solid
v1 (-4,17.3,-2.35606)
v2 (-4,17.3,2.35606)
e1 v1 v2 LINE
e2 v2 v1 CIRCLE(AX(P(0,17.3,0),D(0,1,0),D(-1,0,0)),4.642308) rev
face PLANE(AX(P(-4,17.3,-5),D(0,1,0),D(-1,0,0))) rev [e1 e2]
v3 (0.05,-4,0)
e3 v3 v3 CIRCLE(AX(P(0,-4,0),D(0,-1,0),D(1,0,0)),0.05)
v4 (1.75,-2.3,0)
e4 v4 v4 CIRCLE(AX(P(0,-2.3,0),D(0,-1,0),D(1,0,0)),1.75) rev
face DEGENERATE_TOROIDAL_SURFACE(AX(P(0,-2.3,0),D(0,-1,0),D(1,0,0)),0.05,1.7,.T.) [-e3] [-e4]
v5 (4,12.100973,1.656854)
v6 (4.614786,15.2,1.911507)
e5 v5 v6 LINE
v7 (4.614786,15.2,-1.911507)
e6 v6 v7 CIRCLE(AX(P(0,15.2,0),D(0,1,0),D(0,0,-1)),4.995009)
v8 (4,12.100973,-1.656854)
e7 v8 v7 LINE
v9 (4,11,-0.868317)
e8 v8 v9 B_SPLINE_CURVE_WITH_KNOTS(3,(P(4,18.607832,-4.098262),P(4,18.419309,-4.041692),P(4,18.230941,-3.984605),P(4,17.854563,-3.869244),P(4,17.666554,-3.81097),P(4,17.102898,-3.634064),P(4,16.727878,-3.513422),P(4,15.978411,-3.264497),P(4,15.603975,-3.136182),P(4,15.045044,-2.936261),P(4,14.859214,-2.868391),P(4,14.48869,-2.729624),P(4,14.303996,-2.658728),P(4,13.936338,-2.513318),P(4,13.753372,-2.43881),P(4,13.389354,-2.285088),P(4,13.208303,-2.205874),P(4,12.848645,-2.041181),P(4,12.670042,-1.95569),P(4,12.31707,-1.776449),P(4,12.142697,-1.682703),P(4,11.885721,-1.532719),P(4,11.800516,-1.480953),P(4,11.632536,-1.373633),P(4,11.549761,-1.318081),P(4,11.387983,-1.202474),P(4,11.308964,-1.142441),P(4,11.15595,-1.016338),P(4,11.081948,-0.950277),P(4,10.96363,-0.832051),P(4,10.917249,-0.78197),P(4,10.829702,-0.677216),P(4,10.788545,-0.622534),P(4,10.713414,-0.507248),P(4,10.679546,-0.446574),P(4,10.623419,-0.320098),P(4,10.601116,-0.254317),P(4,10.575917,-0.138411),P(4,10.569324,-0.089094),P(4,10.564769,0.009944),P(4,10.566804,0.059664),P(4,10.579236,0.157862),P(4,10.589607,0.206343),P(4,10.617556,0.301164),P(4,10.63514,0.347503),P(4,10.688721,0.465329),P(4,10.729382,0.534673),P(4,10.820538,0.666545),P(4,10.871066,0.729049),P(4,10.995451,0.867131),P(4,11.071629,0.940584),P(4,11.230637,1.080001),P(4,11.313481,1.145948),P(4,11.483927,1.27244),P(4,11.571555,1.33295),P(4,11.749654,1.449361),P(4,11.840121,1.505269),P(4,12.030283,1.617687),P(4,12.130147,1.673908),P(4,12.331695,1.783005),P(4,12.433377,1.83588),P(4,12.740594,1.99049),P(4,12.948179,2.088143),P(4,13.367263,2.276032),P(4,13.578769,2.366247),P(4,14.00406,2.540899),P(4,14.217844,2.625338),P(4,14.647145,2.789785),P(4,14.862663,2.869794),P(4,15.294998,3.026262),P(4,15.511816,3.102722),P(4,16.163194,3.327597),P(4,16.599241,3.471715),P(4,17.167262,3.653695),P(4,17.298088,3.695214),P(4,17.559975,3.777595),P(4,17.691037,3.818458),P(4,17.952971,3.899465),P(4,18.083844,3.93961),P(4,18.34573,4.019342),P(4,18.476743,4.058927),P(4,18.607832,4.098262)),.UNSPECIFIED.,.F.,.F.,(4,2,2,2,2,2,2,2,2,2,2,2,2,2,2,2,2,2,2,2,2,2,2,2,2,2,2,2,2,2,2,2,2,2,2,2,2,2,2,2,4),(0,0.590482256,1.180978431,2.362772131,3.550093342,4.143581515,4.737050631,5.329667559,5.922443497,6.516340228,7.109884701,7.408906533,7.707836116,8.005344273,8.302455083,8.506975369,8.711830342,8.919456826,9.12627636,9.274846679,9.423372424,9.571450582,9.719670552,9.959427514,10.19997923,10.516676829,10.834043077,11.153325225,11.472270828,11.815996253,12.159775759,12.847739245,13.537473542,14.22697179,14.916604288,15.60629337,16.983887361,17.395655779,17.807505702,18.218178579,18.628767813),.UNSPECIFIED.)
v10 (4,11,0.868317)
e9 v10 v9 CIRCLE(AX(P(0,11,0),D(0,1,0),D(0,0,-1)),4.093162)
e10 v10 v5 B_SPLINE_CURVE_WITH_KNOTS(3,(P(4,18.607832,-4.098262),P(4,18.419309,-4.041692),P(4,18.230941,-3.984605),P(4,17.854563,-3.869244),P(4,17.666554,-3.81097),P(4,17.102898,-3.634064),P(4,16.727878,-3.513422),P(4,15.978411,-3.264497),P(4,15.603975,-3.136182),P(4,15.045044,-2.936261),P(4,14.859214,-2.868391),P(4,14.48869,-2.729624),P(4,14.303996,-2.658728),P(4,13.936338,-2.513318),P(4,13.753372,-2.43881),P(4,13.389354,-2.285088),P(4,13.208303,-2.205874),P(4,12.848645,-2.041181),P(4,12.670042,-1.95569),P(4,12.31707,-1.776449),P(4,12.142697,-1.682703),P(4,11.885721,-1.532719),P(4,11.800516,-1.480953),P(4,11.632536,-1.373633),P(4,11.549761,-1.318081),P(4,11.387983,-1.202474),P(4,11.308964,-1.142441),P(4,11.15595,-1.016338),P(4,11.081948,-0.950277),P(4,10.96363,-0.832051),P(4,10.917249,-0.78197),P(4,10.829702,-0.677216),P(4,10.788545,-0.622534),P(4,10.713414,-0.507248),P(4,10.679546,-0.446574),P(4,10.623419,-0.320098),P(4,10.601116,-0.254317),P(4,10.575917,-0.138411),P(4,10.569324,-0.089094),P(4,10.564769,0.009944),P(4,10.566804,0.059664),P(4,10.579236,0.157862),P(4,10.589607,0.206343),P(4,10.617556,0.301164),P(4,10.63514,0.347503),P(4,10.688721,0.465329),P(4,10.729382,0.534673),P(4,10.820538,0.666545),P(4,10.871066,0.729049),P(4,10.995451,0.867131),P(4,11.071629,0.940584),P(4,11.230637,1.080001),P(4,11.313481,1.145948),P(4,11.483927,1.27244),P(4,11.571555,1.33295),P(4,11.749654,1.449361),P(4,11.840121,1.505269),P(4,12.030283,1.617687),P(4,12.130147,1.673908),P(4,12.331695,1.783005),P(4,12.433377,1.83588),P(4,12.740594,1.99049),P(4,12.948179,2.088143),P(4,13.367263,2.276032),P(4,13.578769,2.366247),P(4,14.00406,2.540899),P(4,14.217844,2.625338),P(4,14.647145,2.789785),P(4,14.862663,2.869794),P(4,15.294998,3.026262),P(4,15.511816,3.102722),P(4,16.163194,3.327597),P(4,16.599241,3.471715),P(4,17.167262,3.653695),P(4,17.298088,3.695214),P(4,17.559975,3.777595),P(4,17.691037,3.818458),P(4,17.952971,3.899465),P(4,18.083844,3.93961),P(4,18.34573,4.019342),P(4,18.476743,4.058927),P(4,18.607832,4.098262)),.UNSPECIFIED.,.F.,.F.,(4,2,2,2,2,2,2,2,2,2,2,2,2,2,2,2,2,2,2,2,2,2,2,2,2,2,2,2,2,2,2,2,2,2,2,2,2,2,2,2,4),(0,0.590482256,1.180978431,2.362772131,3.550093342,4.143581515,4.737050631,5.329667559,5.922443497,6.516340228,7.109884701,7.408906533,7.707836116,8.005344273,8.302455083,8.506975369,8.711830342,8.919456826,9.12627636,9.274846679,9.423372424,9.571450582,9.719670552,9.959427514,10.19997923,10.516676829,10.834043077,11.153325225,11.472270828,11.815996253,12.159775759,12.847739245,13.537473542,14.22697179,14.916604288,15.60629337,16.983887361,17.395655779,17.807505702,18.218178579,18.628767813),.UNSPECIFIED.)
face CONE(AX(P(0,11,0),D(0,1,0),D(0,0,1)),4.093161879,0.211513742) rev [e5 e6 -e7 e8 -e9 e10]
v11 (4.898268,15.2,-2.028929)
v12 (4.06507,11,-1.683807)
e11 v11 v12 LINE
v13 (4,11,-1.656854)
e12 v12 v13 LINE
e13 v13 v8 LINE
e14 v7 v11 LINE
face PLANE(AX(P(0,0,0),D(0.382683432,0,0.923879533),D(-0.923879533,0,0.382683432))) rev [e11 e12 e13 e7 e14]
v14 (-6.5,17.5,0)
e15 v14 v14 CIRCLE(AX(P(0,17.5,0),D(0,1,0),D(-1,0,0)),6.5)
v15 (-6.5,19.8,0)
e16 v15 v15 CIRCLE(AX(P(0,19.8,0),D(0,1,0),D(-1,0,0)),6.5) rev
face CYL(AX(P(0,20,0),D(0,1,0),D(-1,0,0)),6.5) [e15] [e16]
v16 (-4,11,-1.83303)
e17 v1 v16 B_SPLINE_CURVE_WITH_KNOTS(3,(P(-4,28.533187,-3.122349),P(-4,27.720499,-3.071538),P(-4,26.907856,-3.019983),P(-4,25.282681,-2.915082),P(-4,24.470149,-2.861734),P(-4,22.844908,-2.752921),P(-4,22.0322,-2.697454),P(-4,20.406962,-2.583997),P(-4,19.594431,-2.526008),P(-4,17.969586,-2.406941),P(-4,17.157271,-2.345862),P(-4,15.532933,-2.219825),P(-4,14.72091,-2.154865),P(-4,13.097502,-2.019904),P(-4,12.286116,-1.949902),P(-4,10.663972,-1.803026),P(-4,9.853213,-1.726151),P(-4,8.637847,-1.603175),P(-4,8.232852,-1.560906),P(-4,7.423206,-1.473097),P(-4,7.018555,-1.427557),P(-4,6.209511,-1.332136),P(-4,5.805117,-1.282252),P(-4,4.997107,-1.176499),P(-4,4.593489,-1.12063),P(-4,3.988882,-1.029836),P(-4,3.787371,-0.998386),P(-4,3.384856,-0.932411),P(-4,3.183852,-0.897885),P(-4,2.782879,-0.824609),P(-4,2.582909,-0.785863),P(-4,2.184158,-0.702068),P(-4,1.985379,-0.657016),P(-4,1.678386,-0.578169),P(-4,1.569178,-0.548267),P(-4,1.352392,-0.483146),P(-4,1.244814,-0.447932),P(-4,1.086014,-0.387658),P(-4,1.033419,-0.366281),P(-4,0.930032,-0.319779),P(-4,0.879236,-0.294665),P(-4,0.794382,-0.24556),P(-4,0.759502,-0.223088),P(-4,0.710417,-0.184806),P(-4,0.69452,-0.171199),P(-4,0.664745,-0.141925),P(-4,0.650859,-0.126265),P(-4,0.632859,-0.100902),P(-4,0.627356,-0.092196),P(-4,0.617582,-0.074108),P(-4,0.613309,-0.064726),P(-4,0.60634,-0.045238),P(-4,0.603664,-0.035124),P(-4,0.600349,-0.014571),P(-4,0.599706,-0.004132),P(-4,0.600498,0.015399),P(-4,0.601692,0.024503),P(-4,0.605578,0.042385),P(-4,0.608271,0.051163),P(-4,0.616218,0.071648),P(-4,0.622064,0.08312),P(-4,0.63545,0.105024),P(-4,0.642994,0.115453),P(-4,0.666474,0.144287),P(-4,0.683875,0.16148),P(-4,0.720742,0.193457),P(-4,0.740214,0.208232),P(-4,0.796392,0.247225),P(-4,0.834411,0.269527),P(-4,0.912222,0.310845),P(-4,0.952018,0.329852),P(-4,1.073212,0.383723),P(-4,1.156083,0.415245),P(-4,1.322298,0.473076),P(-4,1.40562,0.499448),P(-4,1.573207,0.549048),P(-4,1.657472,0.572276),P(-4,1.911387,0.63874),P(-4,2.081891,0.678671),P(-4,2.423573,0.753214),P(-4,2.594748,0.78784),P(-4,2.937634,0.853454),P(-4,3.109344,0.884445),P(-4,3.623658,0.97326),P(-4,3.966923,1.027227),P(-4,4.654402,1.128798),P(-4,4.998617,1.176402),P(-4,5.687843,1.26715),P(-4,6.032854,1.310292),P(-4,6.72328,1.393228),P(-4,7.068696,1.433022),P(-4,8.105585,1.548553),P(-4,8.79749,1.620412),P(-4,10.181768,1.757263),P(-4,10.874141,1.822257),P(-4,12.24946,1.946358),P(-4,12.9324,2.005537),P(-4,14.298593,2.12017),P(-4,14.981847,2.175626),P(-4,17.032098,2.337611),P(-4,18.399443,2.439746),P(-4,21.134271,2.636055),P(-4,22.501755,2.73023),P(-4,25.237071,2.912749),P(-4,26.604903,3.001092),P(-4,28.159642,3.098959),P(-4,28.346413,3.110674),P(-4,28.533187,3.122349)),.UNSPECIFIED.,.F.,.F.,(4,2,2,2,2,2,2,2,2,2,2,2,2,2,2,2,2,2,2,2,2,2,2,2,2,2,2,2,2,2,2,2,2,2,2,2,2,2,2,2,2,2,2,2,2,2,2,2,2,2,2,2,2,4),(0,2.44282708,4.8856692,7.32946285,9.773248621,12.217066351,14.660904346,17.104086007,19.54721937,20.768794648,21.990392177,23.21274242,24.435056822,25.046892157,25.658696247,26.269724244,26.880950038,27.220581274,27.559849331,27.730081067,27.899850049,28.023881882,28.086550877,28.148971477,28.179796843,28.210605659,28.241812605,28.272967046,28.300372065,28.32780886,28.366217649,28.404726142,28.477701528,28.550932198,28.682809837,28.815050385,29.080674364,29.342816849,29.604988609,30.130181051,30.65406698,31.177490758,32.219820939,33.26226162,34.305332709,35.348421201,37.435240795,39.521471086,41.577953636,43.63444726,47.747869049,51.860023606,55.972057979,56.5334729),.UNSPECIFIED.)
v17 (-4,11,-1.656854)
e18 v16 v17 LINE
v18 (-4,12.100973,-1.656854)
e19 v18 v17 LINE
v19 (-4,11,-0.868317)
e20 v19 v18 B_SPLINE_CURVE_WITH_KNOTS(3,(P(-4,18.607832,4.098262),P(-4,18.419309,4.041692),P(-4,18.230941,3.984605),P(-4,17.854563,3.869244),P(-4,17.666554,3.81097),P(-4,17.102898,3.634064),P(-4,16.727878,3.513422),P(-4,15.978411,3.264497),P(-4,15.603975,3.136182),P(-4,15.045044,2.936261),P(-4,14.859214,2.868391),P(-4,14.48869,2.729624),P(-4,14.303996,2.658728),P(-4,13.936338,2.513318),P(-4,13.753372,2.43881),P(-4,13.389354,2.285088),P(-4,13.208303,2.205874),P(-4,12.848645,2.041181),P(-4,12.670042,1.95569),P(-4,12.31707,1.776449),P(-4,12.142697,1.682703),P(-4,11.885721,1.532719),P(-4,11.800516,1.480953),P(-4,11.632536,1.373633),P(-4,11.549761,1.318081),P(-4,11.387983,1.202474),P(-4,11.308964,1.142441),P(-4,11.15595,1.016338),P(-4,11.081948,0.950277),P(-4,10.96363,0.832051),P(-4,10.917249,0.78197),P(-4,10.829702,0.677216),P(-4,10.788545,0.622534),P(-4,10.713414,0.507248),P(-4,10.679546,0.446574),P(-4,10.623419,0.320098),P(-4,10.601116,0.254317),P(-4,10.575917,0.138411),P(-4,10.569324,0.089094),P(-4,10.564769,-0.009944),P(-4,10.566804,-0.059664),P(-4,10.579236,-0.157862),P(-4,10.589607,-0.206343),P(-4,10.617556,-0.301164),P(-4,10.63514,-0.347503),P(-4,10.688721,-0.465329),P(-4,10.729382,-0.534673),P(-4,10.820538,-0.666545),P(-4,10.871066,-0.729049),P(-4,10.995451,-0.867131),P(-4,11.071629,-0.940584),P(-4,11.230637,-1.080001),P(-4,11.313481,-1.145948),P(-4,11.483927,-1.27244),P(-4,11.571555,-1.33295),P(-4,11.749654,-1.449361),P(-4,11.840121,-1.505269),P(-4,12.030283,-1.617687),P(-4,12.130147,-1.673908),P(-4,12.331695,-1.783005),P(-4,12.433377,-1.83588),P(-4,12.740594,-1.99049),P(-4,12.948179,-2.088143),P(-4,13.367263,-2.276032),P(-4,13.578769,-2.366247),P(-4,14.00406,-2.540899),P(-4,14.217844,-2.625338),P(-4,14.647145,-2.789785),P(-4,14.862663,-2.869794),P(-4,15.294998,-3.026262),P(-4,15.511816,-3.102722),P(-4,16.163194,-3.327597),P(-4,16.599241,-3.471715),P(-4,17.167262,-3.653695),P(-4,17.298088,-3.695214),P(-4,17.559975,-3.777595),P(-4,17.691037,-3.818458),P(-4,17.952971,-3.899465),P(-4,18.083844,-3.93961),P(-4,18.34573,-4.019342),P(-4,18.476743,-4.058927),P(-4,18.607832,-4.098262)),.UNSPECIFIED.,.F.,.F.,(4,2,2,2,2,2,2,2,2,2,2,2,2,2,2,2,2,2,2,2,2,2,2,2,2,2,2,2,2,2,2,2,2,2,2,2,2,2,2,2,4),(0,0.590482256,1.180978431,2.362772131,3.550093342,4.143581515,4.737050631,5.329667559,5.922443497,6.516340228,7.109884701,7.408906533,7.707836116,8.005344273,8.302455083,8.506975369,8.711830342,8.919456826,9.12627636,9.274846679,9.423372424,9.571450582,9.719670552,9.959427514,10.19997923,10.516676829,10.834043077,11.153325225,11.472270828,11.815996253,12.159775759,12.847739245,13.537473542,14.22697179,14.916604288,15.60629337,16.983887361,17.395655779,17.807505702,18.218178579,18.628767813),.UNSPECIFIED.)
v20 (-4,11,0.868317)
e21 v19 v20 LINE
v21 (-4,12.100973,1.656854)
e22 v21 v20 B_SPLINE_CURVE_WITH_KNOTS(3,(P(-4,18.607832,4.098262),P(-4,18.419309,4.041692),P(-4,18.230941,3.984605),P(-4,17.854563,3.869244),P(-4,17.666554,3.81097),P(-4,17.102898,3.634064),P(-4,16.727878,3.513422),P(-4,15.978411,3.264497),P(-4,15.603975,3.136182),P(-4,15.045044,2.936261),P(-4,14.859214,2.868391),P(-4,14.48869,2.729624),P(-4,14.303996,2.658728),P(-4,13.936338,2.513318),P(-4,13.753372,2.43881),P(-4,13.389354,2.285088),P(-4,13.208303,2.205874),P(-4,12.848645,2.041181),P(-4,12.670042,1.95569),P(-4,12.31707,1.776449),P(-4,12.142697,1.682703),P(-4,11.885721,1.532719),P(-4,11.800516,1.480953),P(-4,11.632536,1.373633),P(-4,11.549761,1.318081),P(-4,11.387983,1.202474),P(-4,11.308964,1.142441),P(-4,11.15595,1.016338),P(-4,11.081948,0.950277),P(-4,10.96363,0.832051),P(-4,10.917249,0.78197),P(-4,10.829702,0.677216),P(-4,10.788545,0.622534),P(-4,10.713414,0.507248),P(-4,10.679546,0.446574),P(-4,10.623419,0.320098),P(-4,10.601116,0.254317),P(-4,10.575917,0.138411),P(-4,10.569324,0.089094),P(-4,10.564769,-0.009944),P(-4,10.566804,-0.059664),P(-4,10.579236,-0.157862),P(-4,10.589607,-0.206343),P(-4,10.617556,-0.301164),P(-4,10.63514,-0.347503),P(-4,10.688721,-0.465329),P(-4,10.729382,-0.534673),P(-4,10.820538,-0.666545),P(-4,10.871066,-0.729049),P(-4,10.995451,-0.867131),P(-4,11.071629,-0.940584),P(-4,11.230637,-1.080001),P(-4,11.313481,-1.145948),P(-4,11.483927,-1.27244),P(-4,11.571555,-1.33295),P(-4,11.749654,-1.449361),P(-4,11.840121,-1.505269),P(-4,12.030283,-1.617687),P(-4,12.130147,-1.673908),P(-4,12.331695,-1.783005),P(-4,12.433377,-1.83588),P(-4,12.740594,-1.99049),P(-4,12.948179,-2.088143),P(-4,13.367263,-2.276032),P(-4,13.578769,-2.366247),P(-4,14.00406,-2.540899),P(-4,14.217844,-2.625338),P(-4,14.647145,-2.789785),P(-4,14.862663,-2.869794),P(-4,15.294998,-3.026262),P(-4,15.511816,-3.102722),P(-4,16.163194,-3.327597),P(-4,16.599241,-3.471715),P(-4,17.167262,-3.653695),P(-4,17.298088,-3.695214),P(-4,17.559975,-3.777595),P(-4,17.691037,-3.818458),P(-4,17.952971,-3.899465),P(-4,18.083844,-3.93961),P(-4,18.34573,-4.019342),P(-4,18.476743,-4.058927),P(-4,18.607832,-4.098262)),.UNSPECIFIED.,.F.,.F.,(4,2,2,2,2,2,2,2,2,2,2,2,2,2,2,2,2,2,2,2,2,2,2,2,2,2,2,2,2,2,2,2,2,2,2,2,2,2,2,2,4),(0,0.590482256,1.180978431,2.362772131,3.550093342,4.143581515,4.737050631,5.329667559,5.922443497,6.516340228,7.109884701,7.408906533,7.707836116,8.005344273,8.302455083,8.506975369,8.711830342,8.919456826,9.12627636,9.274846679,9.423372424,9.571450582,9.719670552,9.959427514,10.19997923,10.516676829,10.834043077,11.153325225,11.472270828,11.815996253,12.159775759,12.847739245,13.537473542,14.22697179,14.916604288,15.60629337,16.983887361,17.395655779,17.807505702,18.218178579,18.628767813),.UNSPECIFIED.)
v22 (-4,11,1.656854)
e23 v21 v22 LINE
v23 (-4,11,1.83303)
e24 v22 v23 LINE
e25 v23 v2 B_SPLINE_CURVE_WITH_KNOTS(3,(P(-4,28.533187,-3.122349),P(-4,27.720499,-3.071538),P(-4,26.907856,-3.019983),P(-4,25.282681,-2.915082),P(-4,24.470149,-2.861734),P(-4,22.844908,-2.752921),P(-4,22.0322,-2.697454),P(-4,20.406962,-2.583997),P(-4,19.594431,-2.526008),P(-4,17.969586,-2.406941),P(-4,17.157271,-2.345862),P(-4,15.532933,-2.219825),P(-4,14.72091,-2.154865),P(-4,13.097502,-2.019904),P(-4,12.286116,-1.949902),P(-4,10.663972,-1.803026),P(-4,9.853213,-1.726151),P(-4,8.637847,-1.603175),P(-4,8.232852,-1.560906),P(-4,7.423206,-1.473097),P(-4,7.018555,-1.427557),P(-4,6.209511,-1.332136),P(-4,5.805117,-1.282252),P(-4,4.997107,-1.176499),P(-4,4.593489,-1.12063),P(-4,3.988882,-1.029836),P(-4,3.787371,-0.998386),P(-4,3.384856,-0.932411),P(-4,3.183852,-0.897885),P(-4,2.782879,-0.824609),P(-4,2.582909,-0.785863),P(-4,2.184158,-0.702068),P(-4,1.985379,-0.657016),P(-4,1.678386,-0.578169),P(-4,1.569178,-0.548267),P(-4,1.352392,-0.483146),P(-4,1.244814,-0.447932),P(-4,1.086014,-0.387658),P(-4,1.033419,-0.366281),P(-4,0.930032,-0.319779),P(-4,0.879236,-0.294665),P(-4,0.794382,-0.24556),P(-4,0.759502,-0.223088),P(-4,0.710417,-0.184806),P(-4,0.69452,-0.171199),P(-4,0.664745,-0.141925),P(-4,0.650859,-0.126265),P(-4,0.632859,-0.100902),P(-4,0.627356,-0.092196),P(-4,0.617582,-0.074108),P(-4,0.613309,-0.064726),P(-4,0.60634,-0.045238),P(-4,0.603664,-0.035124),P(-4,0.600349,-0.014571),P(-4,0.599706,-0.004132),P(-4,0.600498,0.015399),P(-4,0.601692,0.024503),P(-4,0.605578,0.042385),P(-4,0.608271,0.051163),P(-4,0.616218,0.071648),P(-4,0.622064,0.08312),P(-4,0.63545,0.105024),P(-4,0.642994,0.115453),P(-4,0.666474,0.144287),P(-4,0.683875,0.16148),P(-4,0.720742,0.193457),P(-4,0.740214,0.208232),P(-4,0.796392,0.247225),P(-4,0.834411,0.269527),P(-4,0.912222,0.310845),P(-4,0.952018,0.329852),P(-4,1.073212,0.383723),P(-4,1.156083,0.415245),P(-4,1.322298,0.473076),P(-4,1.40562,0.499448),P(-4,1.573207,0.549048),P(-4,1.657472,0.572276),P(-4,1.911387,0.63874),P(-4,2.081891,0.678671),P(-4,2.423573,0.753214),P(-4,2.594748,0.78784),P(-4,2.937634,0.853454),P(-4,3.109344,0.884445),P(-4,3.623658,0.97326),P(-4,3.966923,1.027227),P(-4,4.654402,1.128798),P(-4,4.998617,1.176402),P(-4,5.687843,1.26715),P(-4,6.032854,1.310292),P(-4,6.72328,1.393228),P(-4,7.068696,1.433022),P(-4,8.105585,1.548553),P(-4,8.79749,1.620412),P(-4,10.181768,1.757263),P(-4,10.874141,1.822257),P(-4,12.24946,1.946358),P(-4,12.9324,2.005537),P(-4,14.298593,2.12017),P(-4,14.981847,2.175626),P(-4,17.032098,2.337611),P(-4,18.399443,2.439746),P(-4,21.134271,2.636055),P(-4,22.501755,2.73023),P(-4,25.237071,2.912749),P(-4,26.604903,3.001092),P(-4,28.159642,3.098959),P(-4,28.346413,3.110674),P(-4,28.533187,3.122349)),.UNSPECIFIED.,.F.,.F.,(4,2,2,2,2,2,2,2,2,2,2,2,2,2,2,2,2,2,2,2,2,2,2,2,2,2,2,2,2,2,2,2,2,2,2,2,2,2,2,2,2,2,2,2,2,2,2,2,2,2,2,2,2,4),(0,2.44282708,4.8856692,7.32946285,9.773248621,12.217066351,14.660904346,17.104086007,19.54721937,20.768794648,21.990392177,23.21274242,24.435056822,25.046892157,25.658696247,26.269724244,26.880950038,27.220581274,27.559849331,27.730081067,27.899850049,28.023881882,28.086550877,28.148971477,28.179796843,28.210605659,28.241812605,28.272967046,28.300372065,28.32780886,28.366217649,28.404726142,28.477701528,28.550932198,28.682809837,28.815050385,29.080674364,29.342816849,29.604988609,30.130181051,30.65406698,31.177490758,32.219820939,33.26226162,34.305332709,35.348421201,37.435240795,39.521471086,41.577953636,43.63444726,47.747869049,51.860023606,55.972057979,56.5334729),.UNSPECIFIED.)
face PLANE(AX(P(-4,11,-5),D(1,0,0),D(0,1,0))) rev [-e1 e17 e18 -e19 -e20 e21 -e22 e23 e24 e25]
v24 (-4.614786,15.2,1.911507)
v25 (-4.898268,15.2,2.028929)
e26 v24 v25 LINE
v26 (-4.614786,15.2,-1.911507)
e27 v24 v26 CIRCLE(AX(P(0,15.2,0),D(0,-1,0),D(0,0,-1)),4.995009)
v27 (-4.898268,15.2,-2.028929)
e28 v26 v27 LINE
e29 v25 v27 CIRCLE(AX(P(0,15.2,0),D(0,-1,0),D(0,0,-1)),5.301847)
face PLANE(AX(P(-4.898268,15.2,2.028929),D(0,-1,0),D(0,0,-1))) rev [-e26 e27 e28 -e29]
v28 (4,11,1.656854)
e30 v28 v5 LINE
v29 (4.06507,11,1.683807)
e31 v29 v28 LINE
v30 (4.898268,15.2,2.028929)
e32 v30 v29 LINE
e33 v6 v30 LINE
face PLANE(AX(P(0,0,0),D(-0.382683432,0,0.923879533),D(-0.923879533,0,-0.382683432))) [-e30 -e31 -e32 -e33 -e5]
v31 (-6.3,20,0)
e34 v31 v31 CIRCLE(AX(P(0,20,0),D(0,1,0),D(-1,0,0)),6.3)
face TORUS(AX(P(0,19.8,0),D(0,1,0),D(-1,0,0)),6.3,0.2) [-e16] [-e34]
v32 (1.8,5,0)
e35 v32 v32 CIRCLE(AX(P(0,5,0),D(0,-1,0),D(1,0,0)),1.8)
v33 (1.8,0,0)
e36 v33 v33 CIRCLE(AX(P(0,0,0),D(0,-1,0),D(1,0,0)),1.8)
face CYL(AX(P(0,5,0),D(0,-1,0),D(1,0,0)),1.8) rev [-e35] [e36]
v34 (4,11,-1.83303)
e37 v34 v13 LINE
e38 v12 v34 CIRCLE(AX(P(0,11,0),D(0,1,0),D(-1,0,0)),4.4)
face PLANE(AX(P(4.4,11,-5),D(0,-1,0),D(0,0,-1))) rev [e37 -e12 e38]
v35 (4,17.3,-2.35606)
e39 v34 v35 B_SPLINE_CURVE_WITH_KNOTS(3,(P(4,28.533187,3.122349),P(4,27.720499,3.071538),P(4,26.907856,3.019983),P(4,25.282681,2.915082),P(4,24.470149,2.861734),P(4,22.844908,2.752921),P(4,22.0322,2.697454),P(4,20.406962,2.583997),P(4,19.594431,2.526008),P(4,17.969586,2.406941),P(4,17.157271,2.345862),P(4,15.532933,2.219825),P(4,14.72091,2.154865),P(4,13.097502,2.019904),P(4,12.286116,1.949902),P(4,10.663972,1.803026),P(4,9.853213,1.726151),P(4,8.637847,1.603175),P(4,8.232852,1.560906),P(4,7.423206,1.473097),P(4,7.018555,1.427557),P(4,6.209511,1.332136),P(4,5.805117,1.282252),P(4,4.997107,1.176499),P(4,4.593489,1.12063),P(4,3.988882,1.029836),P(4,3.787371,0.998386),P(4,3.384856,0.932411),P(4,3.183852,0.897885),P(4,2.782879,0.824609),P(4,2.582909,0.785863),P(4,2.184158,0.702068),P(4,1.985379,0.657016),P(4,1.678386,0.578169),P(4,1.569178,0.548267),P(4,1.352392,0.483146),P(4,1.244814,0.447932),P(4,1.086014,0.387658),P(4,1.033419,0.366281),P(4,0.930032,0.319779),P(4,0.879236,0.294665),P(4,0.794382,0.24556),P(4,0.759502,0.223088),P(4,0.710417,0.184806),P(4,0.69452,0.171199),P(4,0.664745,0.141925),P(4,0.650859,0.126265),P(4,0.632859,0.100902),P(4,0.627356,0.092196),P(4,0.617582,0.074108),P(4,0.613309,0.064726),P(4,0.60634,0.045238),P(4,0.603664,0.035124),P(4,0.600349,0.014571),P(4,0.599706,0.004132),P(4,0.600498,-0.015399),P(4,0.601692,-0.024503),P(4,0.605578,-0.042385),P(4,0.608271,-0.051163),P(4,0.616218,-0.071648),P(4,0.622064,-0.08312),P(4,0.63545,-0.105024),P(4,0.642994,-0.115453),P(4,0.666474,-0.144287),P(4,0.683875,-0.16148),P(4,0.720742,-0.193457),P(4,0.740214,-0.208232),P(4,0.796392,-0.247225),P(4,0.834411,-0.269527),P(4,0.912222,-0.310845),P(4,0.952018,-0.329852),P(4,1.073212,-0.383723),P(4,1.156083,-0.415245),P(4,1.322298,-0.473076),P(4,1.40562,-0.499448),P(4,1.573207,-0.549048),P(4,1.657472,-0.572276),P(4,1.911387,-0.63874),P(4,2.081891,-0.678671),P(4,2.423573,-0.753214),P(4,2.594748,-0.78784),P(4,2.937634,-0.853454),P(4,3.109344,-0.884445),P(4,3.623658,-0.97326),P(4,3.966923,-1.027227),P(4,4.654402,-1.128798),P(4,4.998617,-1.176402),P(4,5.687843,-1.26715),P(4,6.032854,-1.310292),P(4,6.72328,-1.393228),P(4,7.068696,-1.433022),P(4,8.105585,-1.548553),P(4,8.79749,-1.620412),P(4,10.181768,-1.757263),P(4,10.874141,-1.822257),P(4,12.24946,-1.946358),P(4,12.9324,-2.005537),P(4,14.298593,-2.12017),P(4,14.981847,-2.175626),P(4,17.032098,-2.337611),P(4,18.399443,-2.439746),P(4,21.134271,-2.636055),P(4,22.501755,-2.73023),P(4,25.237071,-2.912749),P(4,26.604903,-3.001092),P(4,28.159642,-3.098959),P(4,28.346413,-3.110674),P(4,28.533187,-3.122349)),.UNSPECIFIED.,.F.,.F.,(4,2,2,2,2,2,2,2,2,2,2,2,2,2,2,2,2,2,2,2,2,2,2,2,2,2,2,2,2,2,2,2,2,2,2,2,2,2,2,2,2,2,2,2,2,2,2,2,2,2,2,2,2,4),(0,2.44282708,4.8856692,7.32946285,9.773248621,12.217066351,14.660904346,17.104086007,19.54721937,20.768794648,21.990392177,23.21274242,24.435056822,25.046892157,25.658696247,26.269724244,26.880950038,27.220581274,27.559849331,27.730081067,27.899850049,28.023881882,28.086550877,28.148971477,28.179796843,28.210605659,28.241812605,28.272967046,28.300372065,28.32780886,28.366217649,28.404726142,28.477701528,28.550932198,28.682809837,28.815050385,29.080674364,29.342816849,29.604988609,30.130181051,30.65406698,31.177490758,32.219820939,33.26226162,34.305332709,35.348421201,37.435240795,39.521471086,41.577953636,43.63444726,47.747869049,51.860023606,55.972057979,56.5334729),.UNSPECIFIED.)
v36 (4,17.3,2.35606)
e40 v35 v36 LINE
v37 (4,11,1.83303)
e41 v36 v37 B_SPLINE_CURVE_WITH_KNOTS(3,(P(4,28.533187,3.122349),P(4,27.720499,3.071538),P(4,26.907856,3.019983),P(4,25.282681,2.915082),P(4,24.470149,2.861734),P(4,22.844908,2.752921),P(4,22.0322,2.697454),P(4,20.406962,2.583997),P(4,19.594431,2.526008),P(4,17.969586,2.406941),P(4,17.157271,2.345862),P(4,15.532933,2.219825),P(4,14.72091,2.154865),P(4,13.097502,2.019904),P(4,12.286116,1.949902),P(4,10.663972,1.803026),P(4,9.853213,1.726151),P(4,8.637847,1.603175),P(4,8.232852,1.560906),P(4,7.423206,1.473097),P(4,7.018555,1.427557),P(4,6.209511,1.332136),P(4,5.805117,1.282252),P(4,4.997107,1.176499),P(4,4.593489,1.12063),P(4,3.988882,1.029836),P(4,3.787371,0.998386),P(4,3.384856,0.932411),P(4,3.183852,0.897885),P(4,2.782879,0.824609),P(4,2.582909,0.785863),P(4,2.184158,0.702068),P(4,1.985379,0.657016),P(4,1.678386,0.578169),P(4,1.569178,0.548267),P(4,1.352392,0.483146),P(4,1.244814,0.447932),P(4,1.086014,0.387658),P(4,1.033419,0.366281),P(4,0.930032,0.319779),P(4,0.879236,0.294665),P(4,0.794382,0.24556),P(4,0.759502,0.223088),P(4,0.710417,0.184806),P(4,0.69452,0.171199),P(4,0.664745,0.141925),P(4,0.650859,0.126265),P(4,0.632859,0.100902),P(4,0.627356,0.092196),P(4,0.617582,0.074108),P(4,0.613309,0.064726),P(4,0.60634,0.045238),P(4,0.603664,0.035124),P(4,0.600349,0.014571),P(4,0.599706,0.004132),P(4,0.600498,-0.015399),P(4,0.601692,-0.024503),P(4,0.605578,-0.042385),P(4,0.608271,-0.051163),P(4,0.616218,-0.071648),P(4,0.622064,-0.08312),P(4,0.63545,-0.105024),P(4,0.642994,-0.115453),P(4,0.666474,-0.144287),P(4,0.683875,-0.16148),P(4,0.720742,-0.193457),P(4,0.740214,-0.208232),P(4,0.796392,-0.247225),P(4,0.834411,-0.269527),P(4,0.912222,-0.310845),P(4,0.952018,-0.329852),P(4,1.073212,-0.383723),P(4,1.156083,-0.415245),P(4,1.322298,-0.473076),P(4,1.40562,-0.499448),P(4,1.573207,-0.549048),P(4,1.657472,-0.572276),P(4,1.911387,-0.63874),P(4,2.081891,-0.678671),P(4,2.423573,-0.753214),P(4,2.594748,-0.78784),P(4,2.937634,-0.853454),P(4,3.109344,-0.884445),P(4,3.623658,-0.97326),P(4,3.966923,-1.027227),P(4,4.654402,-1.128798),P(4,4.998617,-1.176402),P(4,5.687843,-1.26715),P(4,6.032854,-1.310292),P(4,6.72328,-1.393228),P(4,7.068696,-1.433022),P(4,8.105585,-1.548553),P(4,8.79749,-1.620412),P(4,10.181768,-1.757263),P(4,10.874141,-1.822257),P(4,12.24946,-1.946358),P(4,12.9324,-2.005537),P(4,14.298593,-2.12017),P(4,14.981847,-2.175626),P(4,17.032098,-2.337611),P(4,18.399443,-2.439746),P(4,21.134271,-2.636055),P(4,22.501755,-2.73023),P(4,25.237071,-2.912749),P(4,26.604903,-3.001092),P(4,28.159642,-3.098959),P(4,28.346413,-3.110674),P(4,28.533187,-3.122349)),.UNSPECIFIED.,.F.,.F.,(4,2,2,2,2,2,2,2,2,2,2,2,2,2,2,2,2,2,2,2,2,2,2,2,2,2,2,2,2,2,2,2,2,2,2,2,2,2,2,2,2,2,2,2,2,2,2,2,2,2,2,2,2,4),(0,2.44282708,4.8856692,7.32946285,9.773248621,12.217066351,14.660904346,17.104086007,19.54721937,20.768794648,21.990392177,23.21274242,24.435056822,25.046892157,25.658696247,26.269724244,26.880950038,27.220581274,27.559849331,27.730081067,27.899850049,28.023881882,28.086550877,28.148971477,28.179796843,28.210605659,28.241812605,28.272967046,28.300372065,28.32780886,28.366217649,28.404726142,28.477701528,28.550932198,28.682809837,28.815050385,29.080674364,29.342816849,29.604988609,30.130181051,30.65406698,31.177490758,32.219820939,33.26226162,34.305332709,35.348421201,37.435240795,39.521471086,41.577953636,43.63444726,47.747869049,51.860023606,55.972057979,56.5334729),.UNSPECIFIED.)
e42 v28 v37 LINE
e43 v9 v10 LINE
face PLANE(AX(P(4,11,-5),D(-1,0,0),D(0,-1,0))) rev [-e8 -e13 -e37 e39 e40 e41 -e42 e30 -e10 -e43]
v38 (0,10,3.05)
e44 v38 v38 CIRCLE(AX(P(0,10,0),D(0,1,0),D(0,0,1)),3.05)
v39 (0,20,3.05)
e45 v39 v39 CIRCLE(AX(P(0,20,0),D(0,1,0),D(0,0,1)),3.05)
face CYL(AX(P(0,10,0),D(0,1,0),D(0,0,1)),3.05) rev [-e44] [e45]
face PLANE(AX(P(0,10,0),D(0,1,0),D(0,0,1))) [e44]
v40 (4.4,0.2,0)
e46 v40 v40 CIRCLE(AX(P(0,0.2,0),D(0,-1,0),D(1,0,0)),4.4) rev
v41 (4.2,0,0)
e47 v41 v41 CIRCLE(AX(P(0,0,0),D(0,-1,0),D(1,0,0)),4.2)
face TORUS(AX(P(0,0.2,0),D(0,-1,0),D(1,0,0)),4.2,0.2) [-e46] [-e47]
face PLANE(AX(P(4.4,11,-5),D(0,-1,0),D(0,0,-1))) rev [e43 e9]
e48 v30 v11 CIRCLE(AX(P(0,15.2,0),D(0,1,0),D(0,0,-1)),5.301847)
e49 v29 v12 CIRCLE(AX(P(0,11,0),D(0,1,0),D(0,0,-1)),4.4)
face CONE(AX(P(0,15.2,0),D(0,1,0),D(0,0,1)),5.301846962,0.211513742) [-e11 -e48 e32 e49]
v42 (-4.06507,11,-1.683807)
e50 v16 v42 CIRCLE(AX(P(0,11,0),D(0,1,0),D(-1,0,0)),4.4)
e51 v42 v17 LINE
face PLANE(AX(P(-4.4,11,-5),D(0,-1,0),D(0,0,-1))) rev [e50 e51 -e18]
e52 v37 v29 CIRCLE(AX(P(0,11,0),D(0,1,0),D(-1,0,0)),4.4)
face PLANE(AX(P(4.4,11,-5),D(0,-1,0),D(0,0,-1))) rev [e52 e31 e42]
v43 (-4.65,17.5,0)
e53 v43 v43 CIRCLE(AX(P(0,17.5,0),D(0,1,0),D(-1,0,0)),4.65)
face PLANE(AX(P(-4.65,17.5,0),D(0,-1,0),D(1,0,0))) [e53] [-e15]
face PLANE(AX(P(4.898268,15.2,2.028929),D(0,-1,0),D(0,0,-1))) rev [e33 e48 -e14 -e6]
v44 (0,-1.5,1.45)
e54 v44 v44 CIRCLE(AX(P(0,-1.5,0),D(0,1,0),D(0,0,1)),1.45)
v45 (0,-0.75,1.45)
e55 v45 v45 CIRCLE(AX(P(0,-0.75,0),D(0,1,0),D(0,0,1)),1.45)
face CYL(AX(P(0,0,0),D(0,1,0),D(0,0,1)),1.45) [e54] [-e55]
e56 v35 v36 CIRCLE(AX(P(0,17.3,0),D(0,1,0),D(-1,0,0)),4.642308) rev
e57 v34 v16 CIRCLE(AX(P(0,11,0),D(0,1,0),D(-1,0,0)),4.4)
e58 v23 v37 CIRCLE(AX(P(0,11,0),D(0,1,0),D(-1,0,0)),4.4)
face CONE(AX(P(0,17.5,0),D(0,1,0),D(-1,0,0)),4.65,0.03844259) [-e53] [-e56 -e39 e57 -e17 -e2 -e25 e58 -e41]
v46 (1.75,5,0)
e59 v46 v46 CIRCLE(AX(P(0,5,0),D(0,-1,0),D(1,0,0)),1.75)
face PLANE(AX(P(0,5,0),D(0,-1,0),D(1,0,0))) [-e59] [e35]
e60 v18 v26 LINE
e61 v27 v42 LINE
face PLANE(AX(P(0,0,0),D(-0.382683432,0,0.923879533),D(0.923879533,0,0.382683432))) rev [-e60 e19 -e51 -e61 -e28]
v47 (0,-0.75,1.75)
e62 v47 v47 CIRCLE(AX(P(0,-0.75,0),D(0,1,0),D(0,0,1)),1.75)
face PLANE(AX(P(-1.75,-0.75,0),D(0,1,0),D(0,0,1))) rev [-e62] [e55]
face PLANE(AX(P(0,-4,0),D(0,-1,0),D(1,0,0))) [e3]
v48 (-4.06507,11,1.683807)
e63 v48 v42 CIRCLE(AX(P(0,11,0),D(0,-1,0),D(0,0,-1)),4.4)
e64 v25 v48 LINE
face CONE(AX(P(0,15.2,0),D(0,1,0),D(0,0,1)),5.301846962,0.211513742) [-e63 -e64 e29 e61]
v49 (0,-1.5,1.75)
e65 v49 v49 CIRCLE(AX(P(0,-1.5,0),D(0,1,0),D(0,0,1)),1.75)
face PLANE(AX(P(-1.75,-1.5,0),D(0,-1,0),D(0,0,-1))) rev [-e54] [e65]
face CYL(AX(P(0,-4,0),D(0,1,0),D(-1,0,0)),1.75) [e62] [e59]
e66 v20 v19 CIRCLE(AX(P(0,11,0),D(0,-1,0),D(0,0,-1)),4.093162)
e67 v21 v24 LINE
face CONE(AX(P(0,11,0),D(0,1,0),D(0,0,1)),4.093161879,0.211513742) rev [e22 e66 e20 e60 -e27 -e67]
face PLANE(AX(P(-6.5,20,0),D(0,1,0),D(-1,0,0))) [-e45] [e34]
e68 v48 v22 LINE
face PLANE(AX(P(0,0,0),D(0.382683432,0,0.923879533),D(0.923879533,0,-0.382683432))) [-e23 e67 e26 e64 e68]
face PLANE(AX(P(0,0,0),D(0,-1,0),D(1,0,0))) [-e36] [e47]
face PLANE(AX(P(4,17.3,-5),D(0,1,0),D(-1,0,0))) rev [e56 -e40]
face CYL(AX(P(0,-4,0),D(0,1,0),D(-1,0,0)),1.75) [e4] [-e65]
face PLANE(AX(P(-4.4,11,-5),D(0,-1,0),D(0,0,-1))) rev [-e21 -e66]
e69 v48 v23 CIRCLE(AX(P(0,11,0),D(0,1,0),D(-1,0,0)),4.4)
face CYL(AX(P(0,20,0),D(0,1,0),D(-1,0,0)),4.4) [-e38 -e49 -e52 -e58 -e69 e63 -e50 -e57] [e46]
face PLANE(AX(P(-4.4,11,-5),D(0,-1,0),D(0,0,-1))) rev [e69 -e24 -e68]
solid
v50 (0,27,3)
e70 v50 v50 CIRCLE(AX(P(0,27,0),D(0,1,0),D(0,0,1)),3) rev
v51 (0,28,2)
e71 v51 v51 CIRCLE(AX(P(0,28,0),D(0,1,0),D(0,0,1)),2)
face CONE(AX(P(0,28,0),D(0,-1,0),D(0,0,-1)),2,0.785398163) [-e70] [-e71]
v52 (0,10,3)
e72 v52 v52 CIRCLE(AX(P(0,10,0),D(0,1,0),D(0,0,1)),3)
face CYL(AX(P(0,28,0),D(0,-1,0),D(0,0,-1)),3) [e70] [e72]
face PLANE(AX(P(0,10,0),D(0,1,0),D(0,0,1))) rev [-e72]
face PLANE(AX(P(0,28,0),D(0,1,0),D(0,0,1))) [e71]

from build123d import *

# Parameters (mm, degrees)
FILLET1_R           = 0.2
CUT_EXTRUDE1_DEPTH  = 5
REVOLVE2_ANGLE      = 45.000276
SKETCH4_R           = 3.05
CUT_EXTRUDE2_DEPTH  = 10
SKETCH5_R           = 3
BOSS_EXTRUDE1_DEPTH = 18
CHAMFER1_SIZE       = 1
SKETCH6_R           = 1.8
CUT_EXTRUDE3_DEPTH  = 5
SKETCH7_R           = 1.75
BOSS_EXTRUDE2_DEPTH = 9
FILLET2_R           = 1.7
SKETCH8_W           = 0.3
SKETCH8_H           = 0.75


# Read off the part's stored shape, not the designer's step: Revolve2
with BuildPart() as part:
    # Sketch1 → Revolve1 (revolve)
    with BuildSketch(Plane.XY):
        Polygon((0, 0), (-4.4, 0), (-4.4, 11), (-4.65, 17.5), (-6.5, 17.5), (-6.5, 20), (0, 20), align=None)
    revolve(axis=Axis((0, 20, 0), (0, -1, 0)))

    # Fillet1
    fillet1_edges = [part.edges().sort_by_distance(p)[0] for p in [
        (6.5, 20, 0),
        (4.4, 0, 0),
    ]]
    fillet(fillet1_edges, radius=FILLET1_R)

    # Sketch2 → Cut-Extrude1 (cut, symmetric)
    with BuildSketch(Plane.XY):
        Polygon((-4, 11), (-4, 17.3), (-4.642307692, 17.3), (-4.4, 11), align=None)
        Polygon((4.4, 11), (4, 11), (4, 17.3), (4.642307692, 17.3), align=None)
    extrude(amount=CUT_EXTRUDE1_DEPTH, both=True, mode=Mode.SUBTRACT)

    # Revolve2 outline → Revolve2 (revolve)
    with BuildSketch(Plane(origin=(0, 0, 0), x_dir=(-0.923879239596717, 0, -0.3826841395226511), z_dir=(0.3826841395226511, 0, -0.923879239596717))):
        Polygon((4.4, 12.42897871), (4.093159214, 10.999987589), (4.4, 10.999987589), align=None)
        Polygon((4.995008841, 15.2), (4.4, 12.42897871), (4.4, 10.999987589), (5.301846962, 15.2), align=None)
    revolve2 = revolve(axis=Axis((0, 0, 0), (0, 1, 0)), revolution_arc=REVOLVE2_ANGLE)

    # Mirror1: Revolve2 across plane
    add(revolve2.mirror(Plane(origin=(0, 0, 0), x_dir=(0, 0, 1), z_dir=(1, 0, 0))))

    # Sketch4 → Cut-Extrude2 (cut)
    with BuildSketch(Plane(origin=(0, 20, 0), x_dir=(1, 0, 0), z_dir=(0, 1, 0))):
        with Locations(Location((0, 0, 0), (0, 0, 270))):
            Circle(SKETCH4_R)
    extrude(amount=-CUT_EXTRUDE2_DEPTH, mode=Mode.SUBTRACT)

    # Sketch6 → Cut-Extrude3 (cut)
    with BuildSketch(Plane(origin=(0, 0, 0), x_dir=(-1, 0, 0), z_dir=(0, -1, 0))):
        with Locations(Location((0, 0, 0), (0, 0, 180))):
            Circle(SKETCH6_R)
    extrude(amount=-CUT_EXTRUDE3_DEPTH, mode=Mode.SUBTRACT)

    # Sketch7 → Boss-Extrude2 (add)
    with BuildSketch(Plane(origin=(0, 5, 0), x_dir=(-1, 0, 0), z_dir=(0, -1, 0))):
        with Locations(Location((0, 0, 0), (0, 0, 180))):
            Circle(SKETCH7_R)
    extrude(amount=BOSS_EXTRUDE2_DEPTH)

    # Fillet2
    fillet2_edges = [part.edges().sort_by_distance(p)[0] for p in [
        (-1.75, -4, 0),
    ]]
    fillet(fillet2_edges, radius=FILLET2_R)

    # Sketch8 → Cut-Revolve1 (revolve, cut)
    with BuildSketch(Plane.XY, mode=Mode.PRIVATE) as cut_revolve1_sk:
        with Locations((-1.6, -1.125)):
            Rectangle(SKETCH8_W, SKETCH8_H)
    revolve(cut_revolve1_sk.sketch.rotate(Axis((0, 0, 0), (0, -1, 0)), 270), axis=Axis((0, 0, 0), (0, -1, 0)), mode=Mode.SUBTRACT)


with BuildPart() as body_2:
    # Sketch5 → Boss-Extrude1 (new body)
    with BuildSketch(Plane(origin=(0, 10, 0), x_dir=(1, 0, 0), z_dir=(0, 1, 0))):
        with Locations(Location((0, 0, 0), (0, 0, 270))):
            Circle(SKETCH5_R)
    extrude(amount=BOSS_EXTRUDE1_DEPTH)

    # Chamfer1
    chamfer1_edges = [body_2.edges().sort_by_distance(p)[0] for p in [
        (0, 28, -3),
    ]]
    chamfer(chamfer1_edges, length=CHAMFER1_SIZE)


solid = Compound([part.part, body_2.part])
